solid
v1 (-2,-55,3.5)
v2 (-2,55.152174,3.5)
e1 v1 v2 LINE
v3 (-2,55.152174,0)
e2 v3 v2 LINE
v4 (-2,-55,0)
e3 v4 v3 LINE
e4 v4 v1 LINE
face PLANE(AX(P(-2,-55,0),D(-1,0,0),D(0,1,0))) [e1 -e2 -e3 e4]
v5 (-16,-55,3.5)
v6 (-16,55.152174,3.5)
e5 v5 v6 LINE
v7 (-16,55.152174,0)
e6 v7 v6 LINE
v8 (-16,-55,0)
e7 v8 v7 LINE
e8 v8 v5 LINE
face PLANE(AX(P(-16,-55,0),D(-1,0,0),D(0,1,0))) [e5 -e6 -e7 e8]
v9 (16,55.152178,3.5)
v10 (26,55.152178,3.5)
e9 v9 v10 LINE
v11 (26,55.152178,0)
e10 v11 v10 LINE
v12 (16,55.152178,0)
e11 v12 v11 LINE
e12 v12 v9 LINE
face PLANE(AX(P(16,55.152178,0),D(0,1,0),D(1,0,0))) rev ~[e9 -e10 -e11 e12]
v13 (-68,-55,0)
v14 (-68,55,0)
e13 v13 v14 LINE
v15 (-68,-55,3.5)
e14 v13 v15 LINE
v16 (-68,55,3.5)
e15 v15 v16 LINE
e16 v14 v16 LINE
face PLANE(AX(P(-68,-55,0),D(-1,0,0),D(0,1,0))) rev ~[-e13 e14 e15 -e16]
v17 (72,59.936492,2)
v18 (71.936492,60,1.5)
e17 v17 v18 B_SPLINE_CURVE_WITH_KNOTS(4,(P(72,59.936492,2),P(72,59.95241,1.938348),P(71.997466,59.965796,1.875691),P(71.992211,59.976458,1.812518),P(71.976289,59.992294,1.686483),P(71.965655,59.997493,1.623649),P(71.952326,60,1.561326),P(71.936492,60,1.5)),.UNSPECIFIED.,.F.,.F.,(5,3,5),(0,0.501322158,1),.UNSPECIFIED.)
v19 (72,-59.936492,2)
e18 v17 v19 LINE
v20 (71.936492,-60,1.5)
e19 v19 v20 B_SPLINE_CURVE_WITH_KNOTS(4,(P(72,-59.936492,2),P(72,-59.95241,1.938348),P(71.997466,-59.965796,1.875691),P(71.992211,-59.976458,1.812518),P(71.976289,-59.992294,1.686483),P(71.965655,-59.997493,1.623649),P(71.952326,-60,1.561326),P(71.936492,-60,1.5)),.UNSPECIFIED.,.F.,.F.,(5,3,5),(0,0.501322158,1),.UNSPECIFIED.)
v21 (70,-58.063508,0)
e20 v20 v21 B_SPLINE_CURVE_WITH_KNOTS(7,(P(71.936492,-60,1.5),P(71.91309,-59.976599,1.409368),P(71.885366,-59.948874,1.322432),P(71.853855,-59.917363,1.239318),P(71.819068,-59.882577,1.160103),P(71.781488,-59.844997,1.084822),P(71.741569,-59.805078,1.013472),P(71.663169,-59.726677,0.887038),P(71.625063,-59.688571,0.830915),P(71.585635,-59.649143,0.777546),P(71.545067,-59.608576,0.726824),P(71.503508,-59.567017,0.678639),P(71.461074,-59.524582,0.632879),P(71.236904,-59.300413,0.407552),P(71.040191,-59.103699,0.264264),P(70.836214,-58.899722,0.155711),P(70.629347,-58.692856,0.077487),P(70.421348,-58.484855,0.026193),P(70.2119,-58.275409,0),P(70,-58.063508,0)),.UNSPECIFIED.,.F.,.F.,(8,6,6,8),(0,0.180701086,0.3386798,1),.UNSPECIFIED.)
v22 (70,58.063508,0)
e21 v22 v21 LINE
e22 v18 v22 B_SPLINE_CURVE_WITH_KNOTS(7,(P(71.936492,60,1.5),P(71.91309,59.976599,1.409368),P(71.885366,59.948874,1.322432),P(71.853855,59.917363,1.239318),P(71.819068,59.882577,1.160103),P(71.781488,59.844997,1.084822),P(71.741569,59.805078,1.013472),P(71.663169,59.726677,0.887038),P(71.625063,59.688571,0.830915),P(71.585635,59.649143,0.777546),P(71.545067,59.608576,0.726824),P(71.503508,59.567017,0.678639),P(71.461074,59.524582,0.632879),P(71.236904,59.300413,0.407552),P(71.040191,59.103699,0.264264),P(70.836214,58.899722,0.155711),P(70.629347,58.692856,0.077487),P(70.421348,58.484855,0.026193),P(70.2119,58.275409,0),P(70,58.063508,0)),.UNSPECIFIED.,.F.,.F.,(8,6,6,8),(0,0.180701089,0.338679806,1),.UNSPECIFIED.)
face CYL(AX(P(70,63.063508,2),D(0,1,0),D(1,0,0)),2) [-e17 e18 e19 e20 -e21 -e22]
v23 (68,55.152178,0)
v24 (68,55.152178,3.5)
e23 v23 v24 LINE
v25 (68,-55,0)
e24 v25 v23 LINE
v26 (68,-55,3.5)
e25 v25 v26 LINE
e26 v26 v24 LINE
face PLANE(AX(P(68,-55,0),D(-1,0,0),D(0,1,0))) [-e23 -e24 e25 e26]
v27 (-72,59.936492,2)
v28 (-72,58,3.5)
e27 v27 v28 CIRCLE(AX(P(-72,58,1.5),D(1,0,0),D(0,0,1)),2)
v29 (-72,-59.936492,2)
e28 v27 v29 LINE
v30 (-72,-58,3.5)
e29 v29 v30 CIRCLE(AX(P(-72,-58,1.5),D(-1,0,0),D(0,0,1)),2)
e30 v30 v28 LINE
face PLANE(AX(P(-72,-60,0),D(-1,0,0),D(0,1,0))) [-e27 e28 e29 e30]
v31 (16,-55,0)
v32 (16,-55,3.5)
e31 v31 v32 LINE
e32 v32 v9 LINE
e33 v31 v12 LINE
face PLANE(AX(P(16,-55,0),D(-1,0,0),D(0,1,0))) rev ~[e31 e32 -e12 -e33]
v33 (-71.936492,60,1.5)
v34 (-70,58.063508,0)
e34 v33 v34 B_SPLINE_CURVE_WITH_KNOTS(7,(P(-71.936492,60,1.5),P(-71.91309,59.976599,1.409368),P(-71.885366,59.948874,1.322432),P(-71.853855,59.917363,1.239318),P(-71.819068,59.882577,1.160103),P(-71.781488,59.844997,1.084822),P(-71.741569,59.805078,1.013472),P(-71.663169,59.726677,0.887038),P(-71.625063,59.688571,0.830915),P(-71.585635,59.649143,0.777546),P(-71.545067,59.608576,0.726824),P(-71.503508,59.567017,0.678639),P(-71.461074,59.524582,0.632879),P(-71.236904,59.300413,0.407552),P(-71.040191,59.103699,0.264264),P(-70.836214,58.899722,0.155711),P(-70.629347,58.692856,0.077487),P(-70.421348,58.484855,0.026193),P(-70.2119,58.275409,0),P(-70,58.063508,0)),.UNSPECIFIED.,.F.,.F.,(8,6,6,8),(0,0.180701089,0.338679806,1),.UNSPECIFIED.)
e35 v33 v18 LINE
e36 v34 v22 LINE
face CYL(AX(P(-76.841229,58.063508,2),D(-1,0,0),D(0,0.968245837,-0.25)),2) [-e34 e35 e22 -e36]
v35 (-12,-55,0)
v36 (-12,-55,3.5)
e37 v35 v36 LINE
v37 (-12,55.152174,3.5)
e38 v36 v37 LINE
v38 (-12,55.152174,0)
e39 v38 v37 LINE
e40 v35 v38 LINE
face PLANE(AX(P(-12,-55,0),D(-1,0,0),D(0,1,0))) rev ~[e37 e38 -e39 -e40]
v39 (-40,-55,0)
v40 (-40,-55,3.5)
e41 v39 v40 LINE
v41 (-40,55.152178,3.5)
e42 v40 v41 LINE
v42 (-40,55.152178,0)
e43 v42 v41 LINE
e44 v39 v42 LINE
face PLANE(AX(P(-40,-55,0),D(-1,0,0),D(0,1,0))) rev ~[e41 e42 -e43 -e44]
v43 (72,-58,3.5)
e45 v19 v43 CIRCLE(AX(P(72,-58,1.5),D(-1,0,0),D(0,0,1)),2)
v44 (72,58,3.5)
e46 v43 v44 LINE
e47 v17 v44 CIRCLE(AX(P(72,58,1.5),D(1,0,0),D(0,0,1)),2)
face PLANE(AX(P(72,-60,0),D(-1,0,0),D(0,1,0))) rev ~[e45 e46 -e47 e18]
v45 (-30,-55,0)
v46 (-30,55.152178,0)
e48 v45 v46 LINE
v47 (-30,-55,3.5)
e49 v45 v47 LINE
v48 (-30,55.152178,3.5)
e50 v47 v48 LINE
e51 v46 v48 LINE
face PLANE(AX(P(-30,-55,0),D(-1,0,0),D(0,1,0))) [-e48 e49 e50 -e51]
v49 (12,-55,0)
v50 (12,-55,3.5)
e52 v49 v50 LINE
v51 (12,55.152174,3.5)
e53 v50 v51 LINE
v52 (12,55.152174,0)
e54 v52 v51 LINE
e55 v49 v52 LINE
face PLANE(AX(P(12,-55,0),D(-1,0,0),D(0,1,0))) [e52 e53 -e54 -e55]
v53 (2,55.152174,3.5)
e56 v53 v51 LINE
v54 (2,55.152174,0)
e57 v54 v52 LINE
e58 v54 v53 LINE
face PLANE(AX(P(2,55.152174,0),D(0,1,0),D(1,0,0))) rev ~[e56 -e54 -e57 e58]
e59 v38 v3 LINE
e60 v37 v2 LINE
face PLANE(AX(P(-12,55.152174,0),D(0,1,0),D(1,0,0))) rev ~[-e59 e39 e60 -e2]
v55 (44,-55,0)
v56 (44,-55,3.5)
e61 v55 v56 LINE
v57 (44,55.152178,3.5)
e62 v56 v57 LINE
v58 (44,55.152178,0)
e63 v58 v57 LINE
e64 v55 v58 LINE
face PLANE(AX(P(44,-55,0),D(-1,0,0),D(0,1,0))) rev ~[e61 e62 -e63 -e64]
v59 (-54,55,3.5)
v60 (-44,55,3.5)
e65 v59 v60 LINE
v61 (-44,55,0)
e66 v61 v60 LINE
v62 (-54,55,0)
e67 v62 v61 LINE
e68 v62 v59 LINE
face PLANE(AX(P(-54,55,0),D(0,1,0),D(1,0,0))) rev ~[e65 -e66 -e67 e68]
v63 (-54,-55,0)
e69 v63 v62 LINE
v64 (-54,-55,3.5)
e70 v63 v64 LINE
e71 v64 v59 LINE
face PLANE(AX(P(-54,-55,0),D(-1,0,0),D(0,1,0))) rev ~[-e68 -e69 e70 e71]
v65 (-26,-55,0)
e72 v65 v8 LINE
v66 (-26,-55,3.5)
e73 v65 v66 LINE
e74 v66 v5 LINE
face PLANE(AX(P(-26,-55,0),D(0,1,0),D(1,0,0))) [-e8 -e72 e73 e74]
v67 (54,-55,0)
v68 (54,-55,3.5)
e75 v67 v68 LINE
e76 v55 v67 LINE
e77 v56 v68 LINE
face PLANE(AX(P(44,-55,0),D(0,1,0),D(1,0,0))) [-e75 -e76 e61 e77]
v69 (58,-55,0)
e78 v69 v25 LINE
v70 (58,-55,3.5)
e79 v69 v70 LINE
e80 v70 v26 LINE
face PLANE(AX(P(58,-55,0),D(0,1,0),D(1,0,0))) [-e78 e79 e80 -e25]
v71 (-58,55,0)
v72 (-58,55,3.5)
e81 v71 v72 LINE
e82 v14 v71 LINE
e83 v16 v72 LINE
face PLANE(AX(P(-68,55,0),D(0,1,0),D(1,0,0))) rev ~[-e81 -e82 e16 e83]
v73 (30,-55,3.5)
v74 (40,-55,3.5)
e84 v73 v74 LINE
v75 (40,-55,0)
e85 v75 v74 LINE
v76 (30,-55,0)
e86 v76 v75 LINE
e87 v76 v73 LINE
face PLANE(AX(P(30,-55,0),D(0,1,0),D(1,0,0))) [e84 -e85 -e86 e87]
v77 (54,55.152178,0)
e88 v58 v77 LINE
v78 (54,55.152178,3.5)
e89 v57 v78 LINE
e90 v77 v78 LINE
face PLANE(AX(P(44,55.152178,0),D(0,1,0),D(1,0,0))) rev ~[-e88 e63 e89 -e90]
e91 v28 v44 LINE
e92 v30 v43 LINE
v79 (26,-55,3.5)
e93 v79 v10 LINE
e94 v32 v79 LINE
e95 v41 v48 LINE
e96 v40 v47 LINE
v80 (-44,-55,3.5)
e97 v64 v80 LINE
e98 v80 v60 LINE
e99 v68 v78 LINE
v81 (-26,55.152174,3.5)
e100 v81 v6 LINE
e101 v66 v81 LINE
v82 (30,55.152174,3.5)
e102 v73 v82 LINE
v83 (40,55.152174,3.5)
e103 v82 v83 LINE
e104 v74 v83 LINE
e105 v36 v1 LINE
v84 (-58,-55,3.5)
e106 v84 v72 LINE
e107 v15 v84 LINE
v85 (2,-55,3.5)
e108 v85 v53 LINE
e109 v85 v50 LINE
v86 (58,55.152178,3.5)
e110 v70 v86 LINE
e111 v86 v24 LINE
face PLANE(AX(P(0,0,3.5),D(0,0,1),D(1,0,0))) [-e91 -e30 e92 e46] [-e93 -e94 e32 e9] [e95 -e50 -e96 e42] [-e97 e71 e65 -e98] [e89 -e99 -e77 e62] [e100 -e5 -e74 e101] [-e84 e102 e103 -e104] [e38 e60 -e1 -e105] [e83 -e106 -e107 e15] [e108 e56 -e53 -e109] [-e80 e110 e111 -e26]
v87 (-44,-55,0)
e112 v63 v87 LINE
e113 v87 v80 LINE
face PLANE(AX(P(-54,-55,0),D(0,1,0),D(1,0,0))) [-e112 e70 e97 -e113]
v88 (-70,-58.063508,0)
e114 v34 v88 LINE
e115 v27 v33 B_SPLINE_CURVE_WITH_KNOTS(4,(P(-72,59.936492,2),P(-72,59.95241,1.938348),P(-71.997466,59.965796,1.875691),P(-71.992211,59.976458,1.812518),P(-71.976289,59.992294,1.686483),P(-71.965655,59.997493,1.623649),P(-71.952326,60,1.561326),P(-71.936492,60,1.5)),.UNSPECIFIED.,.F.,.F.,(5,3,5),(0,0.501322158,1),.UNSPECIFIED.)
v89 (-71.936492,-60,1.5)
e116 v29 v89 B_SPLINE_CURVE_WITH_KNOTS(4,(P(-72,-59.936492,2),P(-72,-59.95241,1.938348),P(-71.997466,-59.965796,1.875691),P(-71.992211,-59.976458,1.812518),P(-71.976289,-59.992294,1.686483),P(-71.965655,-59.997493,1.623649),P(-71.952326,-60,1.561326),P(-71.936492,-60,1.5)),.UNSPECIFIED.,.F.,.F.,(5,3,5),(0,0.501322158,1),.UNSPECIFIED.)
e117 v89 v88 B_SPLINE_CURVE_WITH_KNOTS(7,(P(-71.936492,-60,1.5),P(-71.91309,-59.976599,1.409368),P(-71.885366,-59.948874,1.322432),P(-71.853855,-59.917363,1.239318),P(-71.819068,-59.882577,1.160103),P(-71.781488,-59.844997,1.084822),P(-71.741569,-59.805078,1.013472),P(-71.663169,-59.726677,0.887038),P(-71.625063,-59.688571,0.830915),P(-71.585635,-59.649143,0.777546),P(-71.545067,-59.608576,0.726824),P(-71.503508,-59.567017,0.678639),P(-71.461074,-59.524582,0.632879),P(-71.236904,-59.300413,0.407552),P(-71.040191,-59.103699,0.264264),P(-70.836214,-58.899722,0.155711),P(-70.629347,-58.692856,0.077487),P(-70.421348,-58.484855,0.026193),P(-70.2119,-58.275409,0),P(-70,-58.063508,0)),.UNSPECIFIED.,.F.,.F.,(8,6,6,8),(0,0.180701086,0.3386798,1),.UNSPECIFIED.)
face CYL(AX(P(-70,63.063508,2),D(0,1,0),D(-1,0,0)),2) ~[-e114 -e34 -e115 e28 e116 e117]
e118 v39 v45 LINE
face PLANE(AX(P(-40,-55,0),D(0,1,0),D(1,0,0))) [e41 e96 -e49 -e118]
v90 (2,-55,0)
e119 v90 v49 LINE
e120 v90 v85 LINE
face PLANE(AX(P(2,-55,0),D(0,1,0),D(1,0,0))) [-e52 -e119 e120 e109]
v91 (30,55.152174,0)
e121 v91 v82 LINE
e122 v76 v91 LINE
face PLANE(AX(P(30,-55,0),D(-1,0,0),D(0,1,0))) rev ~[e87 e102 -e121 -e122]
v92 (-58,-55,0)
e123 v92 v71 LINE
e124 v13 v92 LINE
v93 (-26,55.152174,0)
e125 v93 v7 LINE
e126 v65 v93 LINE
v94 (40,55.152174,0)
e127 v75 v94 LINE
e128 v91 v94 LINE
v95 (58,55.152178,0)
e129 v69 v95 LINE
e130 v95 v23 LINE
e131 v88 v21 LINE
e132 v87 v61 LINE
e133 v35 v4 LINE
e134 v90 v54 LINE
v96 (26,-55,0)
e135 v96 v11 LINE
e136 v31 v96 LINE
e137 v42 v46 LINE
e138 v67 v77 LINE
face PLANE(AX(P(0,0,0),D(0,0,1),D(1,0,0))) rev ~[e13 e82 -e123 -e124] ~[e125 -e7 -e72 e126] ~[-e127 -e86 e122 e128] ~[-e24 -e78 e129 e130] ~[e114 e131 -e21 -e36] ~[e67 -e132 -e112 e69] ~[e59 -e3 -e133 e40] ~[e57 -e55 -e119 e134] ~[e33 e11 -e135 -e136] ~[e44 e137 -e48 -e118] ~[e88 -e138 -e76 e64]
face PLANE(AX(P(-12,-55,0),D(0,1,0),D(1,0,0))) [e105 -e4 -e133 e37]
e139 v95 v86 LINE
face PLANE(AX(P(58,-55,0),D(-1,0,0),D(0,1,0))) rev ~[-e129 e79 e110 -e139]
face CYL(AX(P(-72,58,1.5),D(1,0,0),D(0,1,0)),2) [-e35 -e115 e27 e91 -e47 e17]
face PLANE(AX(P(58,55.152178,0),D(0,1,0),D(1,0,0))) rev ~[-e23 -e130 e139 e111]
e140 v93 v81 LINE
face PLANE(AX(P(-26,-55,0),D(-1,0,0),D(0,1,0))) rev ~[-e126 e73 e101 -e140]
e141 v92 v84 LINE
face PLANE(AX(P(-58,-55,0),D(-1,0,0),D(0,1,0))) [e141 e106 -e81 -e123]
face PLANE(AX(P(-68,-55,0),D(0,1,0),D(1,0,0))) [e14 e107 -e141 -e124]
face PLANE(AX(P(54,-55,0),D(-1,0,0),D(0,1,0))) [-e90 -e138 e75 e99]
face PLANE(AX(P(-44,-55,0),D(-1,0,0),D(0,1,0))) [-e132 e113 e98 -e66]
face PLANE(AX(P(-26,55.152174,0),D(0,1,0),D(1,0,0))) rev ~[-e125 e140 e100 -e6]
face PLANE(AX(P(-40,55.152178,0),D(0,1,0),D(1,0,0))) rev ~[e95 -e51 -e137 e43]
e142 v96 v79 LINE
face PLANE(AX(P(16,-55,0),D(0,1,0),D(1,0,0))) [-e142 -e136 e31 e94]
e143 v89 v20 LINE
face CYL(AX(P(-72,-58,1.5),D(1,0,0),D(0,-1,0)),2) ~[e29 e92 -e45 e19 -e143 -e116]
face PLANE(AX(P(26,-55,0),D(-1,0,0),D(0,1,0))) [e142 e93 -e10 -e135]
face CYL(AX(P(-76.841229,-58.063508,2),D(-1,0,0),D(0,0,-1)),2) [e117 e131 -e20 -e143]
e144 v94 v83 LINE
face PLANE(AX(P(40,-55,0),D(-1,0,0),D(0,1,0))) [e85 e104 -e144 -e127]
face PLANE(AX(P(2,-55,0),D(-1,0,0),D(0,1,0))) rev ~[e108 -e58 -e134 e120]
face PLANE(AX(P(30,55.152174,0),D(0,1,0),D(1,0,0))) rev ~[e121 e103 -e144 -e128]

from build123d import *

# Parameters (mm, degrees)
F0_W        = 144
F0_H        = 120
F0_W_2      = 10
F0_H_2      = 110
F0_H_3      = 110.1521776617
F0_H_4      = 110.1521739364
F1_DEPTH    = 3.5
F2_R        = 2
F3_T1_DEPTH = 153.6824583655
F4_T1_DEPTH = 126.1270166538


# Not quite as in the source:
# - a fillet or chamfer that OpenCascade refuses, or shapes differently, is made with other operations: its cross-section is extruded or revolved along the edge and cut away or added


with BuildPart() as f1:
    # F0 (on Top) → F1 (new body)
    with BuildSketch(Plane.XY):
        Rectangle(F0_W, F0_H)
        with Locations((-63, 0)):
            Rectangle(F0_W_2, F0_H_2, mode=Mode.SUBTRACT)
        with Locations((-49, 0)):
            Rectangle(F0_W_2, F0_H_2, mode=Mode.SUBTRACT)
        with Locations((-35, 0.0760888308)):
            Rectangle(F0_W_2, F0_H_3, mode=Mode.SUBTRACT)
        with Locations((-21, 0.0760869682)):
            Rectangle(F0_W_2, F0_H_4, mode=Mode.SUBTRACT)
        with Locations((-7, 0.0760869682)):
            Rectangle(F0_W_2, F0_H_4, mode=Mode.SUBTRACT)
        with Locations((7, 0.0760869682)):
            Rectangle(F0_W_2, F0_H_4, mode=Mode.SUBTRACT)
        with Locations((21, 0.0760888308)):
            Rectangle(F0_W_2, F0_H_3, mode=Mode.SUBTRACT)
        with Locations((35, 0.0760869682)):
            Rectangle(F0_W_2, F0_H_4, mode=Mode.SUBTRACT)
        with Locations((49, 0.0760888308)):
            Rectangle(F0_W_2, F0_H_3, mode=Mode.SUBTRACT)
        with Locations((63, 0.0760888308)):
            Rectangle(F0_W_2, F0_H_3, mode=Mode.SUBTRACT)
    extrude(amount=F1_DEPTH)

    # F2
    f2_edges = [f1.edges().sort_by_distance(p)[0] for p in [
        (0, 60, 3.5),
        (0, -60, 3.5),
    ]]
    fillet(f2_edges, radius=F2_R)

    # F3: fillet of radius 2 on 2 edges, made by hand

    # F3_s2 → F3_t1 (cut)
    with BuildSketch(Plane.YZ.offset(-76.8412291828)):
        with BuildLine():
            ThreePointArc((-58.0635083269, 0), (-59.2882531983, 0.4188611699), (-60, 1.5))
            Line((-60, 1.5), (-60, 0))
            Line((-60, 0), (-58.0635083269, 0))
        make_face()
        with BuildLine():
            ThreePointArc((60, 1.5), (59.2882531983, 0.4188611699), (58.0635083269, 0))
            Line((58.0635083269, 0), (60, 0))
            Line((60, 0), (60, 1.5))
        make_face()
    extrude(amount=F3_T1_DEPTH, mode=Mode.SUBTRACT)

    # F4: fillet of radius 2 on 2 edges, made by hand

    # F4_s2 → F4_t1 (cut)
    with BuildSketch(Plane.XZ.offset(-63.0635083269)):
        with BuildLine():
            ThreePointArc((-72, 2), (-71.4142135624, 0.5857864376), (-70, 0))
            Line((-70, 0), (-72, 0))
            Line((-72, 0), (-72, 2))
        make_face()
        with BuildLine():
            ThreePointArc((72, 2), (71.4142135624, 0.5857864376), (70, 0))
            Line((70, 0), (72, 0))
            Line((72, 0), (72, 2))
        make_face()
    extrude(amount=F4_T1_DEPTH, mode=Mode.SUBTRACT)


solid = f1.part
